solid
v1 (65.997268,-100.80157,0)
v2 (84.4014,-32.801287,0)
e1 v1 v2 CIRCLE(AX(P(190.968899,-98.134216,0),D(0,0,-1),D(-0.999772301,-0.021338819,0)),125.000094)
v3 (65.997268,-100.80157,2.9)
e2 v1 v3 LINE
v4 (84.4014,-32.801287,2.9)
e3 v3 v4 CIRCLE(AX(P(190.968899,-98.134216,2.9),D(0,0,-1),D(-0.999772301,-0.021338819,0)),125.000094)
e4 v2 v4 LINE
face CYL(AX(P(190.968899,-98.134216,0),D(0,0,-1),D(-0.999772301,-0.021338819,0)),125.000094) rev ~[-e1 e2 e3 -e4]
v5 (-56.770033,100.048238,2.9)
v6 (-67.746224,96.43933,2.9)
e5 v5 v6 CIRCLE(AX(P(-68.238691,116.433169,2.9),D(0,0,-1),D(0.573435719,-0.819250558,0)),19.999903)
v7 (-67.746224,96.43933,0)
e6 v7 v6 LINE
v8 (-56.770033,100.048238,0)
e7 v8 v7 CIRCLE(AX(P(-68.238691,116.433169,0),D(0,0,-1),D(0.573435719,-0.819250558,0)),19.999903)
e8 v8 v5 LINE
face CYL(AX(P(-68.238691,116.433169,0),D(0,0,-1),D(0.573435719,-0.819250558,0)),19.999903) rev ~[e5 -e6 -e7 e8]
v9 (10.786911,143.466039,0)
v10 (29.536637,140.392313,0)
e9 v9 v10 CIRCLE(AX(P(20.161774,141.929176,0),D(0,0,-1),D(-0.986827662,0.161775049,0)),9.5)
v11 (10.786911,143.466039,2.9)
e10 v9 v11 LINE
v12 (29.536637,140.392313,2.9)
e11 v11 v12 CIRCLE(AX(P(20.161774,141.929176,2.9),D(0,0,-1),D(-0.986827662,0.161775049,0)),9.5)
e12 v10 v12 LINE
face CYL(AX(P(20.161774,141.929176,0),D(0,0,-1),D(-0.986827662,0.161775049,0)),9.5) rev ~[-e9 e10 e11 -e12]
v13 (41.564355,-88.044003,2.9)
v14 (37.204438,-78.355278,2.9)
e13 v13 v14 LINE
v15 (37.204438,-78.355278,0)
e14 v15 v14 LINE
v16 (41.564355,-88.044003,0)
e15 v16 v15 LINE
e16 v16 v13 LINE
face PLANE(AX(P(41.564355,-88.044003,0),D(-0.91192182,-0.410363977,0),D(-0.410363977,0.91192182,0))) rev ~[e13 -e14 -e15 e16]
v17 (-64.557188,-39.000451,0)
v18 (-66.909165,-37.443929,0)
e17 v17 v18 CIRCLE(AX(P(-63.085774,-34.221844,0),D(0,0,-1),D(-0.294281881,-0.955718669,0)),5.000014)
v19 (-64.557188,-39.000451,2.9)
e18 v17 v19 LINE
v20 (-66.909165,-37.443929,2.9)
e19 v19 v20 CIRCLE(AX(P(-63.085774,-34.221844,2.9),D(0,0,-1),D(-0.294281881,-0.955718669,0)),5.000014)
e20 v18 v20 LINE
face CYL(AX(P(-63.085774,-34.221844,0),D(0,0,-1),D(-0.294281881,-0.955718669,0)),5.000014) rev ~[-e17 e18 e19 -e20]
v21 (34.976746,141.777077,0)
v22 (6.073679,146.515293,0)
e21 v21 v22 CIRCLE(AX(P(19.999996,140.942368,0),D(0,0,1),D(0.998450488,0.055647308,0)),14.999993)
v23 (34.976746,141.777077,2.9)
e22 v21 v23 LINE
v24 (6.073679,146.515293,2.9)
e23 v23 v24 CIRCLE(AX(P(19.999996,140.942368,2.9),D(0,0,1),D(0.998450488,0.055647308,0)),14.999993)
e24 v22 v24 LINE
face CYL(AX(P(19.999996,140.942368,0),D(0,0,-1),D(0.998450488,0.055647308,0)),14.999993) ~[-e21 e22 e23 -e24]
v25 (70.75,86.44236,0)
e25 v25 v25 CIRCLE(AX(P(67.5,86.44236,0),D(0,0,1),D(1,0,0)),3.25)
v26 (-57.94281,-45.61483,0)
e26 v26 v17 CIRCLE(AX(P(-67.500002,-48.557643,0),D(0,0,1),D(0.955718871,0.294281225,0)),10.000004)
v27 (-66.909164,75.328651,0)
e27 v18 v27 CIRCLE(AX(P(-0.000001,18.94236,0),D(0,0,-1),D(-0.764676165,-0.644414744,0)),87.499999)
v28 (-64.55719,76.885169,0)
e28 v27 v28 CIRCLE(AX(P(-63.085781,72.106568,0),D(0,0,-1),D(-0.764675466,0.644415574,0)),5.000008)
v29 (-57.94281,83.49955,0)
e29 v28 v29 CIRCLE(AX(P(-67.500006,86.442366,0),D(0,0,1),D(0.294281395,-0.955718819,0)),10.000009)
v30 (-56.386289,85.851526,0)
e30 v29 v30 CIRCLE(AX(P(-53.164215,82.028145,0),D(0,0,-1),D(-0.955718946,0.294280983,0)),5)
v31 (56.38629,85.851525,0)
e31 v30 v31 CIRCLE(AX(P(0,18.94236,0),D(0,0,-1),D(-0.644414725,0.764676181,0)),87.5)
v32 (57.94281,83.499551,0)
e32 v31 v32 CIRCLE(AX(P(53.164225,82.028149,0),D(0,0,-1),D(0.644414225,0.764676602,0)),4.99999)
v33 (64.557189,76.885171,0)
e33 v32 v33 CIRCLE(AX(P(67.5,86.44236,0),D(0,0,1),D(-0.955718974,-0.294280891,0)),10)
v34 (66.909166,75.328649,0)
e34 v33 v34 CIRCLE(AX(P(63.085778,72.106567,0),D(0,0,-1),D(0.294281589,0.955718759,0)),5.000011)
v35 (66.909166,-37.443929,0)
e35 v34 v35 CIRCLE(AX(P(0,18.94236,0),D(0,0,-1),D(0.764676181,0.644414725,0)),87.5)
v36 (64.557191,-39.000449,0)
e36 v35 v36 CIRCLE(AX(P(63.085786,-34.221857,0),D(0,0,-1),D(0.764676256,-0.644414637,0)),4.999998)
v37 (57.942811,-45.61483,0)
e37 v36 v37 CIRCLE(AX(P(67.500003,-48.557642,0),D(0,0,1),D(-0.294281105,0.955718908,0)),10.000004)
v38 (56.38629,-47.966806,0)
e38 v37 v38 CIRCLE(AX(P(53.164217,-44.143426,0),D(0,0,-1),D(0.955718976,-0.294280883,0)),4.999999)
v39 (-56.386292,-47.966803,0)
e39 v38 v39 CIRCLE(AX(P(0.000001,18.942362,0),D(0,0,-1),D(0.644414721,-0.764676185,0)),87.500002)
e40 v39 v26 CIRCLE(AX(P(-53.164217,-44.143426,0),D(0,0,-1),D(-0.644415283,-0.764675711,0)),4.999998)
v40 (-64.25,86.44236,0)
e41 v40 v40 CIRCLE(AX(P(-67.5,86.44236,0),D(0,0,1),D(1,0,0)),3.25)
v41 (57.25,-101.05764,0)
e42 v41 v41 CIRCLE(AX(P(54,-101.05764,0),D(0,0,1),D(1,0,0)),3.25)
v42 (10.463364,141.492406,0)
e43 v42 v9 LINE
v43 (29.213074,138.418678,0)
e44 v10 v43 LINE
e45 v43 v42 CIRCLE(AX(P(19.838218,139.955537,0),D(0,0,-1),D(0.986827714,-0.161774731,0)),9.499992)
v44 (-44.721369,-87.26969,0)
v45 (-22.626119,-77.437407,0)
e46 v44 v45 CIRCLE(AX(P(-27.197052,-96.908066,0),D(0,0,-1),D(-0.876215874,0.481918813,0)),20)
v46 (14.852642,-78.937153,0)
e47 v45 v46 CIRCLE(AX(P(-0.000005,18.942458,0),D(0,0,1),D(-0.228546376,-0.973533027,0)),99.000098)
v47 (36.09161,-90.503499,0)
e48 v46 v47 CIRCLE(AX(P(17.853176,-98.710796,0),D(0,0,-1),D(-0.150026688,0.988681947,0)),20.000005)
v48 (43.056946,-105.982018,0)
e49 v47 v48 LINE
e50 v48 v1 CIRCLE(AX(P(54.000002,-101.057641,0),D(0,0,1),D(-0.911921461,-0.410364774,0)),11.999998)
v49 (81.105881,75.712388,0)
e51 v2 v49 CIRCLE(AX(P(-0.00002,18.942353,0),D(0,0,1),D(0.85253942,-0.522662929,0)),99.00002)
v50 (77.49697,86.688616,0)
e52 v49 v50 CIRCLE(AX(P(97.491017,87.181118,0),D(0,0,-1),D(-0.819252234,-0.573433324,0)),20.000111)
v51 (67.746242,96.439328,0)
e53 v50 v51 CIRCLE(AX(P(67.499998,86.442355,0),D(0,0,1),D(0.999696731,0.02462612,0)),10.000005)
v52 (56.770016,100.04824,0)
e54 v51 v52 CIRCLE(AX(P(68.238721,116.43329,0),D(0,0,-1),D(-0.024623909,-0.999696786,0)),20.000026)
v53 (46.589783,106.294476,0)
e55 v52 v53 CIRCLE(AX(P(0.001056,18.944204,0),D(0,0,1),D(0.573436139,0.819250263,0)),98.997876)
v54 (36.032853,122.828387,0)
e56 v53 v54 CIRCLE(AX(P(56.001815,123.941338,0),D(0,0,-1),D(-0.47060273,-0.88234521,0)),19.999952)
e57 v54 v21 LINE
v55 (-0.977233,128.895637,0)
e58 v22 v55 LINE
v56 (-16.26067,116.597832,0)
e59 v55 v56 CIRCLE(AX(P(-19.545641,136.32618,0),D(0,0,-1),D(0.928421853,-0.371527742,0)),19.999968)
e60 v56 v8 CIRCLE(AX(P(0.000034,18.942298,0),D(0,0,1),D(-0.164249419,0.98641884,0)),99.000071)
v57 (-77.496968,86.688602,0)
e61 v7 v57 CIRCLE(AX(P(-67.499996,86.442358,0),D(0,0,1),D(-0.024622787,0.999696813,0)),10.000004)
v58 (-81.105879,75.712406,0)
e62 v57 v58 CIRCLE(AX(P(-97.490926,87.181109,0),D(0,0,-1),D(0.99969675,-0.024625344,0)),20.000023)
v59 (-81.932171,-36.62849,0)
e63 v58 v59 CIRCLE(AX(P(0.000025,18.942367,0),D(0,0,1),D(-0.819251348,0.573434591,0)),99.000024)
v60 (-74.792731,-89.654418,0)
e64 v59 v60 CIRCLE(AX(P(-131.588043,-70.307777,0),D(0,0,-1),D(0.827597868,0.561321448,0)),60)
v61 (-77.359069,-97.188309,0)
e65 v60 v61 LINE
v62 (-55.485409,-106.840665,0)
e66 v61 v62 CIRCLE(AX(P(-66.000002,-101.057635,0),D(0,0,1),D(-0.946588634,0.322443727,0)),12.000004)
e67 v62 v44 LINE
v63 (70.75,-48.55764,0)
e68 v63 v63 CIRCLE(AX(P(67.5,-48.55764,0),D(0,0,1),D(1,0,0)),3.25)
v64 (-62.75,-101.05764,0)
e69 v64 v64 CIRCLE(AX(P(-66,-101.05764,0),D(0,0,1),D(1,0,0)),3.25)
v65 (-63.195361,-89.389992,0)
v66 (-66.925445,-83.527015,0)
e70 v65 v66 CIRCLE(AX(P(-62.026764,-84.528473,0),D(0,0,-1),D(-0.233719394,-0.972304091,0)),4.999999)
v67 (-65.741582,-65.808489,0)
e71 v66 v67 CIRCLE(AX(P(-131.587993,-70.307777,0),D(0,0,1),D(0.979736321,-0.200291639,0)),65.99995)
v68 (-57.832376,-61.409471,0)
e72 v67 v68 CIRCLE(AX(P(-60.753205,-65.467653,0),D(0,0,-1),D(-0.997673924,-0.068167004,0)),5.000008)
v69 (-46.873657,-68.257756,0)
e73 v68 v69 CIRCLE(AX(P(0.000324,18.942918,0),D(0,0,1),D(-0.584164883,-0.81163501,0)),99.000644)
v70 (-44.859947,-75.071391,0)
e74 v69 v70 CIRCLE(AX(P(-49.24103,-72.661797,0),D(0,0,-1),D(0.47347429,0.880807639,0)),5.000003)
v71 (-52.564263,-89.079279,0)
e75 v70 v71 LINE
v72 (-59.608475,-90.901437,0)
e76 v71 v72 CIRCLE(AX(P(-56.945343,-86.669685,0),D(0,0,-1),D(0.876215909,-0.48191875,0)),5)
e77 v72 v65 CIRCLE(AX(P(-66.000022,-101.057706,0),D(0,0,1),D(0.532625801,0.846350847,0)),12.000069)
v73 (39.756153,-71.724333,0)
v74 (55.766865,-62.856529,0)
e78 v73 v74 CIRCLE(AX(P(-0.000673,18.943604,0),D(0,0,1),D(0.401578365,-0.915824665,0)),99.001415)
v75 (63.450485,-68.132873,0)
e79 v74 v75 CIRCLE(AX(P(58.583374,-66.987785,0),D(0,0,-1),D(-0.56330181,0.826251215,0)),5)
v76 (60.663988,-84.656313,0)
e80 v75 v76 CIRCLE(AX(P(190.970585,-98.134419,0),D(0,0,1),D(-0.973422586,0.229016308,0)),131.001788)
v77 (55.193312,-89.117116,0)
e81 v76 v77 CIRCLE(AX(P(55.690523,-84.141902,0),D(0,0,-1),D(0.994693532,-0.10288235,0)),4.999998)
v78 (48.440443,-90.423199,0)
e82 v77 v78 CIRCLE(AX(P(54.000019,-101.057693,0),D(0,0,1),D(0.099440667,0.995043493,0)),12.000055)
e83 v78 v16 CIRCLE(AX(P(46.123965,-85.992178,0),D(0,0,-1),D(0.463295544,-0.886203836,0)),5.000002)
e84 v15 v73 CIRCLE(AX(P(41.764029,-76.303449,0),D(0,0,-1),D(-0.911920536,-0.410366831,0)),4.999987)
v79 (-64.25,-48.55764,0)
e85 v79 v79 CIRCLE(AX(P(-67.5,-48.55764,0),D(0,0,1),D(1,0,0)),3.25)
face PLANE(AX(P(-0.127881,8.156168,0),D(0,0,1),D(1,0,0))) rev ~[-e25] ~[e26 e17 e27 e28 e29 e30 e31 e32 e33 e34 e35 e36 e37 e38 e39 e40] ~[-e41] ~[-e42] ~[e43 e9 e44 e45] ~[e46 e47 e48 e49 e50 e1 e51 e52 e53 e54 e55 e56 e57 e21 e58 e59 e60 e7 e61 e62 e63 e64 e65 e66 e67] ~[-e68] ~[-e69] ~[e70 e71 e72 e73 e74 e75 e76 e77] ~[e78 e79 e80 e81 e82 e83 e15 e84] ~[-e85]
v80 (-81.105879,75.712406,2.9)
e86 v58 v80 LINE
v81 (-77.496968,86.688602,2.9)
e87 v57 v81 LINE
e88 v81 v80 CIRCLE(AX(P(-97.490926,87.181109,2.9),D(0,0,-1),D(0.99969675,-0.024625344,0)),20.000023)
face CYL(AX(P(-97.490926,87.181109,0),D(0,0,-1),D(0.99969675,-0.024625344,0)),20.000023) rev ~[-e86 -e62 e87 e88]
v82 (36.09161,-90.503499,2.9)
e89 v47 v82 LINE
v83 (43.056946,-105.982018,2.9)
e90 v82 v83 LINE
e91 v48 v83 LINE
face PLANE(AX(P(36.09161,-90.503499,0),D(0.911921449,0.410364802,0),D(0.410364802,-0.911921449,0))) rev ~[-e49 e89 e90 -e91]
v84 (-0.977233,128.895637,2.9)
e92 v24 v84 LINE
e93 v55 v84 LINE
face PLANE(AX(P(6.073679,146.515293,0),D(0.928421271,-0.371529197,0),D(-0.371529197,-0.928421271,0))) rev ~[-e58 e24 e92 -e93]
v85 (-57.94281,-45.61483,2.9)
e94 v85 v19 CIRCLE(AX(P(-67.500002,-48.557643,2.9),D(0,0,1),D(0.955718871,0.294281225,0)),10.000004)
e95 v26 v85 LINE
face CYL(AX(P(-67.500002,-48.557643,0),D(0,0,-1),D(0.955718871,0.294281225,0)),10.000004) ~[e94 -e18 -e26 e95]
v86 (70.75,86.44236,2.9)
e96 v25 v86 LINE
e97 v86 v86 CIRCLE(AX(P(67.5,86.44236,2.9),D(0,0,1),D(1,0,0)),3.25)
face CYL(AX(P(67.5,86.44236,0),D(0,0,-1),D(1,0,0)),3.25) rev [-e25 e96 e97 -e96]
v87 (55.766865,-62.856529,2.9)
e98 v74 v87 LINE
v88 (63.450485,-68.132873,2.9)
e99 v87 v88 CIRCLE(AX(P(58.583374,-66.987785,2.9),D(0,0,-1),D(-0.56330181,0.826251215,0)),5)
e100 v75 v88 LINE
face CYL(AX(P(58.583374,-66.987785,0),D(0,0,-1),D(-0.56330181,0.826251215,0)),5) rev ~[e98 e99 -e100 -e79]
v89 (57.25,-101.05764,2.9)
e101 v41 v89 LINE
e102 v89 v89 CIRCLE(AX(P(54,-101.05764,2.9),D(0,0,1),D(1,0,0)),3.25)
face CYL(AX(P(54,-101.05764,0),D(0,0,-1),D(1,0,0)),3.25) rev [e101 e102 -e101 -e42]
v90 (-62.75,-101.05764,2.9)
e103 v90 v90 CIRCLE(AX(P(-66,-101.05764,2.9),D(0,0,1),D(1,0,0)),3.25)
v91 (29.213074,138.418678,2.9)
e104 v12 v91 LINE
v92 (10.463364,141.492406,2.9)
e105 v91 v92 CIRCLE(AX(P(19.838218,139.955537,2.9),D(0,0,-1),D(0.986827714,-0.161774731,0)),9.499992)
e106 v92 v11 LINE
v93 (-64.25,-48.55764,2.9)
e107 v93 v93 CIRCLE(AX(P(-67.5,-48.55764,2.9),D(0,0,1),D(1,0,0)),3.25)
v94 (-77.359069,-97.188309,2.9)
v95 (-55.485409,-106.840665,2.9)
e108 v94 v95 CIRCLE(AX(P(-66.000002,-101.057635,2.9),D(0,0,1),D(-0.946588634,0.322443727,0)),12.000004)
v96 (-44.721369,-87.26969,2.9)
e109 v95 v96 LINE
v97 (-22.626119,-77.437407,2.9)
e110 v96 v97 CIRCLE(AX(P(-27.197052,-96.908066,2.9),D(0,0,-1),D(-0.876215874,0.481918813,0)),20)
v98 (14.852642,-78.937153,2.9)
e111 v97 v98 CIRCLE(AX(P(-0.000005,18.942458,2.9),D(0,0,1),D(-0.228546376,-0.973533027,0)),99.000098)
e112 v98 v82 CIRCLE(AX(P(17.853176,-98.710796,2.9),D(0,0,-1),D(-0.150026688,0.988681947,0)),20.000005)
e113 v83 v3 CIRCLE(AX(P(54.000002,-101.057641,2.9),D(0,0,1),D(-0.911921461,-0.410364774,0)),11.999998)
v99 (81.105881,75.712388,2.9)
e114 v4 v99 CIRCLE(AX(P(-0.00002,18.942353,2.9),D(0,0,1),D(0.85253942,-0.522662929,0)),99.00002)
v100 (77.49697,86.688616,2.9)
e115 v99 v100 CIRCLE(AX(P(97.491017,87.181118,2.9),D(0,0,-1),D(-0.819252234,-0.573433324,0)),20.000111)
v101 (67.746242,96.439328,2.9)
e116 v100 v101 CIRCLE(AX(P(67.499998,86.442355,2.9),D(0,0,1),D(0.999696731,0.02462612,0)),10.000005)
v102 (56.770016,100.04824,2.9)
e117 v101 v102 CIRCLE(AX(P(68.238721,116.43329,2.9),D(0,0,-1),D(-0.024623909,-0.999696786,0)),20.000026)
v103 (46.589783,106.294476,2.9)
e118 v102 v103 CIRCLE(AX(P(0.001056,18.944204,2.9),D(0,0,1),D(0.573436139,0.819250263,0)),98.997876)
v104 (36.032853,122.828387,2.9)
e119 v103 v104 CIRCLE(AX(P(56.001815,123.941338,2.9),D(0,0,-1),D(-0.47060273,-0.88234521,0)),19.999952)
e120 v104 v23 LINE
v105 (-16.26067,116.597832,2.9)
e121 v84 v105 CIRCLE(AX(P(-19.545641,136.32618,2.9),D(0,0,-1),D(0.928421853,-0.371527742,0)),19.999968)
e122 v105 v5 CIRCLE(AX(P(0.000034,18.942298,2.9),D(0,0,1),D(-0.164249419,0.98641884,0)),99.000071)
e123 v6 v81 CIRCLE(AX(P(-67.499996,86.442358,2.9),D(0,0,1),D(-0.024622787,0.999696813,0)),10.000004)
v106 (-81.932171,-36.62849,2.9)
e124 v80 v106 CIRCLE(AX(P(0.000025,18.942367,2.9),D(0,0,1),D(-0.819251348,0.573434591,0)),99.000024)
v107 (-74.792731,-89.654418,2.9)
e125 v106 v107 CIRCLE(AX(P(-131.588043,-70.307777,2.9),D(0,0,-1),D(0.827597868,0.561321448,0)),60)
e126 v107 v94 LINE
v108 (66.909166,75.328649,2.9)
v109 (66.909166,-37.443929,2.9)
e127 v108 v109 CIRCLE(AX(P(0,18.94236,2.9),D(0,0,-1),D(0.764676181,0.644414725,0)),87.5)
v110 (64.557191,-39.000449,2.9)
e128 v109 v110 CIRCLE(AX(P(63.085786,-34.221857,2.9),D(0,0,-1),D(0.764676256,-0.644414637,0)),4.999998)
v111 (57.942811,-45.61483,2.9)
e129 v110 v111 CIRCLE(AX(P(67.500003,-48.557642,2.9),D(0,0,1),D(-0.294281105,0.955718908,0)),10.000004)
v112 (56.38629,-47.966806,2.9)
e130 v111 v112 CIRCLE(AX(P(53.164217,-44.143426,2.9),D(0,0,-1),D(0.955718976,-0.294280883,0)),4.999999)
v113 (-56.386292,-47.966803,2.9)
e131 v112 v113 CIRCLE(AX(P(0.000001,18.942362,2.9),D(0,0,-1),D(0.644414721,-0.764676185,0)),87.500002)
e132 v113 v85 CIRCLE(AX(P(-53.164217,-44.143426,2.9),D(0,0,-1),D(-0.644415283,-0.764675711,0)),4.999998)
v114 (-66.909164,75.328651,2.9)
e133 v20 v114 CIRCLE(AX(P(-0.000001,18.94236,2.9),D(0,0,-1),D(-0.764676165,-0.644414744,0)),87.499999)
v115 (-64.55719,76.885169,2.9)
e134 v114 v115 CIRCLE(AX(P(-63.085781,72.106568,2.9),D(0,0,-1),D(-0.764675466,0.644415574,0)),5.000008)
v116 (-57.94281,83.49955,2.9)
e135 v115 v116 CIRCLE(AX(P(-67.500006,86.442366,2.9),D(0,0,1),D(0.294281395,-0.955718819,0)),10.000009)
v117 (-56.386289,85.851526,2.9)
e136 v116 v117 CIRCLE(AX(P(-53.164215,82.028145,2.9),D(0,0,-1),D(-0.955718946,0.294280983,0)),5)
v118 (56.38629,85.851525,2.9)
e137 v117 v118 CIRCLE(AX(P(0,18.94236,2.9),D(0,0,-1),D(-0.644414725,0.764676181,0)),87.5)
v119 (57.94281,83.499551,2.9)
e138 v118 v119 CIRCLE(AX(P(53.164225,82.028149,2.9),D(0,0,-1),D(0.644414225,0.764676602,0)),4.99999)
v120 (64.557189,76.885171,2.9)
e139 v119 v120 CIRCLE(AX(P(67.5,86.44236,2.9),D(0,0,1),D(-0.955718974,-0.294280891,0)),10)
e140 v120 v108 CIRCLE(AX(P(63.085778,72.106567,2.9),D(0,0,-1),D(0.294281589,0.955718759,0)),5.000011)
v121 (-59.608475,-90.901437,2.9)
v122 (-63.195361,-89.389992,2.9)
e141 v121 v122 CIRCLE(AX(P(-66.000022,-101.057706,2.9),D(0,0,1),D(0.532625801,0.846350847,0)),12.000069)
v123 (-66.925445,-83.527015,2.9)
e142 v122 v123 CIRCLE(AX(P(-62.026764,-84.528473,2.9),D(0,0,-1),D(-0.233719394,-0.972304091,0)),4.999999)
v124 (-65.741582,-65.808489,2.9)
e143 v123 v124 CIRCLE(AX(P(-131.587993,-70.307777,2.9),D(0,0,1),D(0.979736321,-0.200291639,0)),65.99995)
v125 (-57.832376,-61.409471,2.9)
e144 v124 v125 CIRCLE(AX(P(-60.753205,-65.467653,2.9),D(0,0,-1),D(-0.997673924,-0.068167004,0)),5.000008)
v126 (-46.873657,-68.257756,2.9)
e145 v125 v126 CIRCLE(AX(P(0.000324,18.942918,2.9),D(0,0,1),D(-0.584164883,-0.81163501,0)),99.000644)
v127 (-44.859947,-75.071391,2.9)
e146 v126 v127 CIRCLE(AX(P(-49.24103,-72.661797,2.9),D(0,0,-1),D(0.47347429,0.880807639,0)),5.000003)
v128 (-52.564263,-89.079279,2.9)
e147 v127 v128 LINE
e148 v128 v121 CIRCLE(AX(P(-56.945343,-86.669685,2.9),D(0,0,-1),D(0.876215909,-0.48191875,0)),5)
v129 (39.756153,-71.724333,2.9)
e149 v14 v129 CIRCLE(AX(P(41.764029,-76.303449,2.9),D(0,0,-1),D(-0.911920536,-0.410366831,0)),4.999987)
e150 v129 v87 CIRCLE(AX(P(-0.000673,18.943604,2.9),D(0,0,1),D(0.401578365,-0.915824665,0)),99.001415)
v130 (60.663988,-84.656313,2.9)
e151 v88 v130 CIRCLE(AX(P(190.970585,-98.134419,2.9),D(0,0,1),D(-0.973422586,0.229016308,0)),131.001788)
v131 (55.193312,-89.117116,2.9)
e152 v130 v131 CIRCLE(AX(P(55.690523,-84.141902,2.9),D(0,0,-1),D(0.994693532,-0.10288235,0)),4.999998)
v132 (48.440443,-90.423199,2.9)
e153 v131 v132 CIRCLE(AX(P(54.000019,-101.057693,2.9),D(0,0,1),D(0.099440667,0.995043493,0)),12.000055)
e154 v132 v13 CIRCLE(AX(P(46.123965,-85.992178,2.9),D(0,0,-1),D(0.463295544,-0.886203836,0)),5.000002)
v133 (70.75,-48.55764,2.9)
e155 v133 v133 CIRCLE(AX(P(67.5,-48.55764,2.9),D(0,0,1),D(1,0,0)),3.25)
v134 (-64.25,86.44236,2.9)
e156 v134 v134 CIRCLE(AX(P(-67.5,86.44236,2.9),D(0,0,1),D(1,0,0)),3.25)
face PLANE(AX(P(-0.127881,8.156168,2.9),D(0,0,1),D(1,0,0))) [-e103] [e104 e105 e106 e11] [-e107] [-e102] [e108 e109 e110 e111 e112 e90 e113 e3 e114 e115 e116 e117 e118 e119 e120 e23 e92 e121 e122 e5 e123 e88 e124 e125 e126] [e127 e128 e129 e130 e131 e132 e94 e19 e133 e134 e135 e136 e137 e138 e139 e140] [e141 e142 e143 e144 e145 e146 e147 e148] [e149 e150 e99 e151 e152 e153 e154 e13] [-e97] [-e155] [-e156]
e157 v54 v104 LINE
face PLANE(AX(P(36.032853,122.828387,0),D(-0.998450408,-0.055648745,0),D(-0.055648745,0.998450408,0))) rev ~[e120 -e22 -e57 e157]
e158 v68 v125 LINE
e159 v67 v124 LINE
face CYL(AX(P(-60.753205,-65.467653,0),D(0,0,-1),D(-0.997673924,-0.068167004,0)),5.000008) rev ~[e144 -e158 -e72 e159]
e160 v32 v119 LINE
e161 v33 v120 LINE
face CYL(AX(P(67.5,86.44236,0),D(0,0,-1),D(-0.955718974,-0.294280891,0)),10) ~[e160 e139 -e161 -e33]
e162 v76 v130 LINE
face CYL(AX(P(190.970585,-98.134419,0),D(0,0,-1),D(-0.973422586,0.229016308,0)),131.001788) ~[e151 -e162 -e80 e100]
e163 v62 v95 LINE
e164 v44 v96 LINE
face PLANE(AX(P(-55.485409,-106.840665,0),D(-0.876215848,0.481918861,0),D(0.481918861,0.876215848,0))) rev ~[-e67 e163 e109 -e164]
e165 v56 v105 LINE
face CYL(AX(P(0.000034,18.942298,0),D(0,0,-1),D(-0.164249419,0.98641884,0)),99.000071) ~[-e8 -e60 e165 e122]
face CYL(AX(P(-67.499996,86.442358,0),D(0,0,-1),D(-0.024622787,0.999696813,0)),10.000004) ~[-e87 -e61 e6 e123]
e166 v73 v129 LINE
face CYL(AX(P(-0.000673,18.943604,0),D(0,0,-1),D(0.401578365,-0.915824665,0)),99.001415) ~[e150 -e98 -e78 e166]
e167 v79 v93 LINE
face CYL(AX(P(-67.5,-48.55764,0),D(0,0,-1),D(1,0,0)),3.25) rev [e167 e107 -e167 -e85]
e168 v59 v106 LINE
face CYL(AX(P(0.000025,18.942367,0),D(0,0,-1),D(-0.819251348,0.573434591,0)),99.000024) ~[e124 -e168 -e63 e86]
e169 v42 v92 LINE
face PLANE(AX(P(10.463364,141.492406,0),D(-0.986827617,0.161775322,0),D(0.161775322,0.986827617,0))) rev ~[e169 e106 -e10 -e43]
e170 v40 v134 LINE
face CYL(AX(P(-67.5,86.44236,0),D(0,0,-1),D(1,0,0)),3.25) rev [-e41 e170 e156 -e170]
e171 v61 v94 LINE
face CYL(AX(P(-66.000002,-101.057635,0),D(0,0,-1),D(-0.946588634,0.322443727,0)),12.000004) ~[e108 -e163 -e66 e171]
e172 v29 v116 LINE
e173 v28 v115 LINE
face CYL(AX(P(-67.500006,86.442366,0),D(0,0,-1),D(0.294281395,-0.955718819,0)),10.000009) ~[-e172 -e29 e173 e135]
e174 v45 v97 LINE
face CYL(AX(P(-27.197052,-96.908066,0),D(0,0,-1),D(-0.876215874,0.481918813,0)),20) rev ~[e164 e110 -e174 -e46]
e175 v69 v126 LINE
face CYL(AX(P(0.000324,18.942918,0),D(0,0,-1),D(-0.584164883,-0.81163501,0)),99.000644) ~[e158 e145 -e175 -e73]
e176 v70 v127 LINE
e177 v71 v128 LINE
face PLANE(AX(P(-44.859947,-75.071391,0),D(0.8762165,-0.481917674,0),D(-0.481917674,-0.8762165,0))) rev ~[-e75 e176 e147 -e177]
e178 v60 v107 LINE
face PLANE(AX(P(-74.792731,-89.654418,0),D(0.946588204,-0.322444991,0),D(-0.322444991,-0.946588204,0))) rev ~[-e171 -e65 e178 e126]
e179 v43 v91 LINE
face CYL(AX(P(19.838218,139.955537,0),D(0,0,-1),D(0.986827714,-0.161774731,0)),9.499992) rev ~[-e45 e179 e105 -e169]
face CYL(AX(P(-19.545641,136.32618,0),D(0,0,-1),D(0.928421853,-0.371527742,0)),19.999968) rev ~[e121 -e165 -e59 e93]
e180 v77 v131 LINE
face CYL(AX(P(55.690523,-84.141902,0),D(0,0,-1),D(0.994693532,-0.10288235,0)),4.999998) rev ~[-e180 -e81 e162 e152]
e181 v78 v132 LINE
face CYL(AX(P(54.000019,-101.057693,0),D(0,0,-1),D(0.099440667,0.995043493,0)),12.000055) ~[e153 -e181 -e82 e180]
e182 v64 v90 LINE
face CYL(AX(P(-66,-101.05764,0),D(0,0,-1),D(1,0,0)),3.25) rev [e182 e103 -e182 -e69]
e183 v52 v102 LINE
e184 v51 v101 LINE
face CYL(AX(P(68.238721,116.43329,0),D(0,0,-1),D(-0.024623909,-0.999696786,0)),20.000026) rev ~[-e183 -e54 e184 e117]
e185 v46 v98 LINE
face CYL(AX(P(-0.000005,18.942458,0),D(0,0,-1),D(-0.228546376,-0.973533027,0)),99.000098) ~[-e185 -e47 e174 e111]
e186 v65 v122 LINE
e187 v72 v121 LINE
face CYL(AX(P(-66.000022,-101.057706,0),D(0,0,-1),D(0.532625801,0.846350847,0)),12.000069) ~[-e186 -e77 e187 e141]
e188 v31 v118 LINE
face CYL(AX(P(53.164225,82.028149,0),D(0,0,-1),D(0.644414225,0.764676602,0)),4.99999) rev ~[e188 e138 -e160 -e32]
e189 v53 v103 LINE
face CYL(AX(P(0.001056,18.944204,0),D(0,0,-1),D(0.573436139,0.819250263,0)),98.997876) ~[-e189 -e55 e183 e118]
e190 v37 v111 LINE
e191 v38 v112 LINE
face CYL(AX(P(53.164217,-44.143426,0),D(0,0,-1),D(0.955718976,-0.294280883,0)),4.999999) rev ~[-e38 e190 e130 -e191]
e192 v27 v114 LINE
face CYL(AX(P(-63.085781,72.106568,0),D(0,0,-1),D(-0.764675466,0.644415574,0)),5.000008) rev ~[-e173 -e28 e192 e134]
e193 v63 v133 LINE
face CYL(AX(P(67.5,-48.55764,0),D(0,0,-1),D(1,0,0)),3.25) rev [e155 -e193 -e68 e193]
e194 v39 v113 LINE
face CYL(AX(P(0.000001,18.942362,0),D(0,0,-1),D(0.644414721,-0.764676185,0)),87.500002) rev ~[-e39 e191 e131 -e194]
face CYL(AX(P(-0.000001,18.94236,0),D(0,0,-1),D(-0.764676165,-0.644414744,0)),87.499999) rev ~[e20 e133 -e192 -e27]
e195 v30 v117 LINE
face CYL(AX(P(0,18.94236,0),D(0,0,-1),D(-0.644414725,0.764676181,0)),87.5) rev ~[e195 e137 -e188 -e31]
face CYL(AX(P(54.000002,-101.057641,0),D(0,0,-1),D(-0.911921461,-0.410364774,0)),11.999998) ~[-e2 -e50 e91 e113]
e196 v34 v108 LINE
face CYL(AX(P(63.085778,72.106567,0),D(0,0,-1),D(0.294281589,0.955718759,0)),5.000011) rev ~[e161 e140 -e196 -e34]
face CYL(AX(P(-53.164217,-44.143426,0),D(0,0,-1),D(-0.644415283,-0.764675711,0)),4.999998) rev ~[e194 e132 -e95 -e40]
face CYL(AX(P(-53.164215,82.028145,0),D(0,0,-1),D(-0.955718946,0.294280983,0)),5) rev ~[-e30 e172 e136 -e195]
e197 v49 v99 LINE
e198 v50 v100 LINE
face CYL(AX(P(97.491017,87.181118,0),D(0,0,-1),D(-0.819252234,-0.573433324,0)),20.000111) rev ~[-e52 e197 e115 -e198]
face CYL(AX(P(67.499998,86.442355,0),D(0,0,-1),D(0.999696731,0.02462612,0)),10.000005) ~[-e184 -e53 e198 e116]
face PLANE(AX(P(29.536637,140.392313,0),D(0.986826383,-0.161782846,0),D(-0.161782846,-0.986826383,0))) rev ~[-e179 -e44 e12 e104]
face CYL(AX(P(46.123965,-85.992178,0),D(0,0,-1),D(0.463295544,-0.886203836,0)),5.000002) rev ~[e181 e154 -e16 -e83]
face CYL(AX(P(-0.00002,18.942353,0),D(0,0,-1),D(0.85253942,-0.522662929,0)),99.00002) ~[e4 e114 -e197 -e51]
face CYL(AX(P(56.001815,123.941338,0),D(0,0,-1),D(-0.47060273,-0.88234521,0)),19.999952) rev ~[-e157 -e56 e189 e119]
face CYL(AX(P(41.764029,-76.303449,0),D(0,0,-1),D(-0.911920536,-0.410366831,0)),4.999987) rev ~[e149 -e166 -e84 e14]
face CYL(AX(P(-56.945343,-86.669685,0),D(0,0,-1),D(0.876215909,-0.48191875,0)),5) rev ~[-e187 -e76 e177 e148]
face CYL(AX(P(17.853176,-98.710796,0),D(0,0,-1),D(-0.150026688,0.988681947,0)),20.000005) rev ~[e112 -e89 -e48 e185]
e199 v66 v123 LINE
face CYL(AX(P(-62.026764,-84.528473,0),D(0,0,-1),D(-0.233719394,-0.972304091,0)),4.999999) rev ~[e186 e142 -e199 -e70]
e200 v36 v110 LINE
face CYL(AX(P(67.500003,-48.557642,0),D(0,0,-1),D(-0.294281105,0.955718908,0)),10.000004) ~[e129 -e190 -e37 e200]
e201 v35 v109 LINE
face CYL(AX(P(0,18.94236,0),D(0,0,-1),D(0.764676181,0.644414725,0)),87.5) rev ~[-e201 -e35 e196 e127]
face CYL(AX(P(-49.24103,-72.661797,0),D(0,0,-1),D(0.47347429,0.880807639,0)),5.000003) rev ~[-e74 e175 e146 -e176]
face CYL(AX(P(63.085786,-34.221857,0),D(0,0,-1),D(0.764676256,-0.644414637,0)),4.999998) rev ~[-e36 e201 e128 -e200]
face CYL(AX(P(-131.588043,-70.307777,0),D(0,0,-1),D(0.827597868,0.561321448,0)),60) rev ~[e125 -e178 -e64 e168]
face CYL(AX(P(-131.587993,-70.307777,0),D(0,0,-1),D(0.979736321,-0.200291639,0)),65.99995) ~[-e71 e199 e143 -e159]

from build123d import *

# Parameters (mm, degrees)
F0_R     = 3.25
F1_DEPTH = 2.9


# Not quite as in the source:
# - ends of sketch curves that miss each other by under 0.0002 mm in the source are joined


with BuildPart() as f1:
    # F0 (on Top) → F1 (new body)
    with BuildSketch(Plane.XY):
        with BuildLine():
            ThreePointArc((-44.7213694768, -87.2696897378), (-35.3282259069, -78.6355727138), (-22.6261189451, -77.437406766))
            ThreePointArc((-22.6261189451, -77.437406766), (-3.9584138319, -79.9784717794), (14.8526419701, -78.9371528028))
            ThreePointArc((14.8526419701, -78.9371528028), (27.4184013914, -81.1464387638), (36.0916099164, -90.5034990376))
            Line((36.0916099164, -90.5034990376), (43.056946, -105.982018))
            ThreePointArc((43.056946, -105.982018), (56.6433108611, -112.762891287), (65.9972675289, -100.8015700101))
            ThreePointArc((65.9972675289, -100.8015700101), (70.3098677706, -65.4781038722), (84.4013998186, -32.8012868888))
            ThreePointArc((84.4013998186, -32.8012868888), (98.9543772418, 21.9475596078), (81.1058809507, 75.7123879655))
            ThreePointArc((81.1058809507, 75.7123879655), (78.4915241697, 80.9342205742), (77.4969704068, 86.68861601))
            ThreePointArc((77.4969704068, 86.68861601), (74.5710678119, 93.5134278119), (67.7462419947, 96.4393277843))
            ThreePointArc((67.7462419947, 96.4393277843), (61.9918305742, 97.4338841697), (56.7700159448, 100.0482399211))
            ThreePointArc((56.7700159448, 100.0482399211), (51.7741884012, 103.3250206324), (46.589782882, 106.2944757787))
            ThreePointArc((46.589782882, 106.2944757787), (39.1449717302, 113.1782098516), (36.0328533434, 122.8283870191))
            Line((36.0328533434, 122.8283870191), (34.976746, 141.777077))
            ThreePointArc((34.976746, 141.777077), (22.4266252093, 155.7447750088), (6.0736789634, 146.5152930146))
            Line((6.0736789634, 146.5152930146), (-0.977233, 128.895637))
            ThreePointArc((-0.977233, 128.895637), (-7.0076373704, 120.7442287718), (-16.2606700755, 116.5978324535))
            ThreePointArc((-16.2606700755, 116.5978324535), (-37.4411993299, 110.5892726198), (-56.7700327307, 100.0482376153))
            ThreePointArc((-56.7700327307, 100.0482376153), (-61.9918290994, 97.4338843258), (-67.7462240106, 96.4393304314))
            ThreePointArc((-67.7462240106, 96.4393304314), (-74.5710678119, 93.5134278119), (-77.4969677843, 86.6886019947))
            ThreePointArc((-77.4969677843, 86.6886019947), (-78.4915233258, 80.9342200994), (-81.1058789211, 75.7124059448))
            ThreePointArc((-81.1058789211, 75.7124059448), (-98.9973221942, 19.6705072268), (-81.9321709394, -36.6284899589))
            ThreePointArc((-81.9321709394, -36.6284899589), (-72.1246020826, -62.3015797591), (-74.7927308672, -89.6544180452))
            Line((-74.7927308672, -89.6544180452), (-77.359069, -97.188309))
            ThreePointArc((-77.359069, -97.188309), (-70.8446126339, -112.0362432093), (-55.4854090748, -106.8406649589))
            Line((-55.4854090748, -106.8406649589), (-44.7213694768, -87.2696897378))
        make_face()
        with Locations((-66, -101.05764)):
            Circle(F0_R, mode=Mode.SUBTRACT)
        with BuildLine():
            ThreePointArc((-52.5642634566, -89.0792787489), (-55.6931843813, -91.5103563164), (-59.6084751577, -90.9014372506))
            ThreePointArc((-59.6084751577, -90.9014372506), (-61.3402321592, -89.9993144635), (-63.1953610952, -89.3899923959))
            ThreePointArc((-63.1953610952, -89.3899923959), (-66.2453647932, -87.2123878479), (-66.9254446607, -83.5270150694))
            ThreePointArc((-66.9254446607, -83.5270150694), (-65.7348712362, -74.7077507104), (-65.7415821416, -65.8084890097))
            ThreePointArc((-65.7415821416, -65.8084890097), (-63.1835418456, -61.0980378443), (-57.8323762514, -61.4094713493))
            ThreePointArc((-57.8323762514, -61.4094713493), (-52.4648777131, -65.01260773), (-46.8736571173, -68.2577562181))
            ThreePointArc((-46.8736571173, -68.2577562181), (-44.4460535436, -71.2446768384), (-44.8599474566, -75.0713907489))
            Line((-44.8599474566, -75.0713907489), (-52.5642634566, -89.0792787489))
        make_face(mode=Mode.SUBTRACT)
        with Locations((-67.5, -48.55764)):
            Circle(F0_R, mode=Mode.SUBTRACT)
        with Locations((54, -101.05764)):
            Circle(F0_R, mode=Mode.SUBTRACT)
        with BuildLine():
            ThreePointArc((55.7668649484, -62.8565289244), (61.4137793469, -62.8660371217), (63.450485388, -68.1328730913))
            ThreePointArc((63.450485388, -68.1328730913), (61.7927741104, -76.349981087), (60.66398801, -84.656313001))
            ThreePointArc((60.66398801, -84.656313001), (58.8502515766, -88.0169614514), (55.1933120197, -89.1171158029))
            ThreePointArc((55.1933120197, -89.1171158029), (51.7212938161, -89.2759806038), (48.4404431818, -90.4231993478))
            ThreePointArc((48.4404431818, -90.4231993478), (44.4890186454, -90.7173209458), (41.5643552496, -88.0440028877))
            Line((41.5643552496, -88.0440028877), (37.204438, -78.355278))
            ThreePointArc((37.204438, -78.355278), (37.0976309763, -74.5077318057), (39.7561530447, -71.7243331019))
            ThreePointArc((39.7561530447, -71.7243331019), (47.9668749837, -67.6612132767), (55.7668649484, -62.8565289244))
        make_face(mode=Mode.SUBTRACT)
        with Locations((67.5, -48.55764)):
            Circle(F0_R, mode=Mode.SUBTRACT)
        with BuildLine():
            ThreePointArc((-57.9428097278, 83.4995499162), (-57.3338219129, 84.7875612773), (-56.3862887981, 85.8515257605))
            ThreePointArc((-56.3862887981, 85.8515257605), (-1.4091e-06, 106.44236), (56.3862897755, 85.8515247336))
            ThreePointArc((56.3862897755, 85.8515247336), (57.3338226492, 84.7875616758), (57.9428104466, 83.4995508296))
            ThreePointArc((57.9428104466, 83.4995508296), (60.4289318502, 79.371292526), (64.557188973, 76.8851709122))
            ThreePointArc((64.557188973, 76.8851709122), (65.8452017985, 76.276181568), (66.9091657605, 75.3286487981))
            ThreePointArc((66.9091657605, 75.3286487981), (87.5, 18.94236), (66.9091656417, -37.443928698))
            ThreePointArc((66.9091656417, -37.443928698), (65.8452017985, -38.391461568), (64.5571911108, -39.00044936))
            ThreePointArc((64.5571911108, -39.00044936), (60.4289318502, -41.486572526), (57.942810631, -45.6148298864))
            ThreePointArc((57.942810631, -45.6148298864), (57.3338226492, -46.9028416758), (56.3862897981, -47.9668057605))
            ThreePointArc((56.3862897981, -47.9668057605), (-1.4091e-06, -68.55764), (-56.3862919305, -47.9668029175))
            ThreePointArc((-56.3862919305, -47.9668029175), (-57.3338219129, -46.9028412773), (-57.9428097278, -45.6148299162))
            ThreePointArc((-57.9428097278, -45.6148299162), (-60.4289318502, -41.486572526), (-64.5571880596, -39.0004511935))
            ThreePointArc((-64.5571880596, -39.0004511935), (-65.8452006758, -38.3914616492), (-66.9091647605, -37.4439287981))
            ThreePointArc((-66.9091647605, -37.4439287981), (-87.5, 18.94236), (-66.9091638256, 75.328650853))
            ThreePointArc((-66.9091638256, 75.328650853), (-65.8452006758, 76.2761816492), (-64.5571898296, 76.8851694466))
            ThreePointArc((-64.5571898296, 76.8851694466), (-60.4289318502, 79.371292526), (-57.9428097278, 83.4995499162))
        make_face(mode=Mode.SUBTRACT)
        with Locations((-67.5, 86.44236)):
            Circle(F0_R, mode=Mode.SUBTRACT)
        with BuildLine():
            ThreePointArc((10.7869112155, 143.4660389647), (21.6986369647, 151.3040387845), (29.5366367845, 140.3923130353))
            Line((29.5366367845, 140.3923130353), (29.213074, 138.418678))
            ThreePointArc((29.213074, 138.418678), (18.3013640353, 130.5806802155), (10.4633642155, 141.4924059647))
            Line((10.4633642155, 141.4924059647), (10.7869112155, 143.4660389647))
        make_face(mode=Mode.SUBTRACT)
        with Locations((67.5, 86.44236)):
            Circle(F0_R, mode=Mode.SUBTRACT)
    extrude(amount=F1_DEPTH)


solid = f1.part
